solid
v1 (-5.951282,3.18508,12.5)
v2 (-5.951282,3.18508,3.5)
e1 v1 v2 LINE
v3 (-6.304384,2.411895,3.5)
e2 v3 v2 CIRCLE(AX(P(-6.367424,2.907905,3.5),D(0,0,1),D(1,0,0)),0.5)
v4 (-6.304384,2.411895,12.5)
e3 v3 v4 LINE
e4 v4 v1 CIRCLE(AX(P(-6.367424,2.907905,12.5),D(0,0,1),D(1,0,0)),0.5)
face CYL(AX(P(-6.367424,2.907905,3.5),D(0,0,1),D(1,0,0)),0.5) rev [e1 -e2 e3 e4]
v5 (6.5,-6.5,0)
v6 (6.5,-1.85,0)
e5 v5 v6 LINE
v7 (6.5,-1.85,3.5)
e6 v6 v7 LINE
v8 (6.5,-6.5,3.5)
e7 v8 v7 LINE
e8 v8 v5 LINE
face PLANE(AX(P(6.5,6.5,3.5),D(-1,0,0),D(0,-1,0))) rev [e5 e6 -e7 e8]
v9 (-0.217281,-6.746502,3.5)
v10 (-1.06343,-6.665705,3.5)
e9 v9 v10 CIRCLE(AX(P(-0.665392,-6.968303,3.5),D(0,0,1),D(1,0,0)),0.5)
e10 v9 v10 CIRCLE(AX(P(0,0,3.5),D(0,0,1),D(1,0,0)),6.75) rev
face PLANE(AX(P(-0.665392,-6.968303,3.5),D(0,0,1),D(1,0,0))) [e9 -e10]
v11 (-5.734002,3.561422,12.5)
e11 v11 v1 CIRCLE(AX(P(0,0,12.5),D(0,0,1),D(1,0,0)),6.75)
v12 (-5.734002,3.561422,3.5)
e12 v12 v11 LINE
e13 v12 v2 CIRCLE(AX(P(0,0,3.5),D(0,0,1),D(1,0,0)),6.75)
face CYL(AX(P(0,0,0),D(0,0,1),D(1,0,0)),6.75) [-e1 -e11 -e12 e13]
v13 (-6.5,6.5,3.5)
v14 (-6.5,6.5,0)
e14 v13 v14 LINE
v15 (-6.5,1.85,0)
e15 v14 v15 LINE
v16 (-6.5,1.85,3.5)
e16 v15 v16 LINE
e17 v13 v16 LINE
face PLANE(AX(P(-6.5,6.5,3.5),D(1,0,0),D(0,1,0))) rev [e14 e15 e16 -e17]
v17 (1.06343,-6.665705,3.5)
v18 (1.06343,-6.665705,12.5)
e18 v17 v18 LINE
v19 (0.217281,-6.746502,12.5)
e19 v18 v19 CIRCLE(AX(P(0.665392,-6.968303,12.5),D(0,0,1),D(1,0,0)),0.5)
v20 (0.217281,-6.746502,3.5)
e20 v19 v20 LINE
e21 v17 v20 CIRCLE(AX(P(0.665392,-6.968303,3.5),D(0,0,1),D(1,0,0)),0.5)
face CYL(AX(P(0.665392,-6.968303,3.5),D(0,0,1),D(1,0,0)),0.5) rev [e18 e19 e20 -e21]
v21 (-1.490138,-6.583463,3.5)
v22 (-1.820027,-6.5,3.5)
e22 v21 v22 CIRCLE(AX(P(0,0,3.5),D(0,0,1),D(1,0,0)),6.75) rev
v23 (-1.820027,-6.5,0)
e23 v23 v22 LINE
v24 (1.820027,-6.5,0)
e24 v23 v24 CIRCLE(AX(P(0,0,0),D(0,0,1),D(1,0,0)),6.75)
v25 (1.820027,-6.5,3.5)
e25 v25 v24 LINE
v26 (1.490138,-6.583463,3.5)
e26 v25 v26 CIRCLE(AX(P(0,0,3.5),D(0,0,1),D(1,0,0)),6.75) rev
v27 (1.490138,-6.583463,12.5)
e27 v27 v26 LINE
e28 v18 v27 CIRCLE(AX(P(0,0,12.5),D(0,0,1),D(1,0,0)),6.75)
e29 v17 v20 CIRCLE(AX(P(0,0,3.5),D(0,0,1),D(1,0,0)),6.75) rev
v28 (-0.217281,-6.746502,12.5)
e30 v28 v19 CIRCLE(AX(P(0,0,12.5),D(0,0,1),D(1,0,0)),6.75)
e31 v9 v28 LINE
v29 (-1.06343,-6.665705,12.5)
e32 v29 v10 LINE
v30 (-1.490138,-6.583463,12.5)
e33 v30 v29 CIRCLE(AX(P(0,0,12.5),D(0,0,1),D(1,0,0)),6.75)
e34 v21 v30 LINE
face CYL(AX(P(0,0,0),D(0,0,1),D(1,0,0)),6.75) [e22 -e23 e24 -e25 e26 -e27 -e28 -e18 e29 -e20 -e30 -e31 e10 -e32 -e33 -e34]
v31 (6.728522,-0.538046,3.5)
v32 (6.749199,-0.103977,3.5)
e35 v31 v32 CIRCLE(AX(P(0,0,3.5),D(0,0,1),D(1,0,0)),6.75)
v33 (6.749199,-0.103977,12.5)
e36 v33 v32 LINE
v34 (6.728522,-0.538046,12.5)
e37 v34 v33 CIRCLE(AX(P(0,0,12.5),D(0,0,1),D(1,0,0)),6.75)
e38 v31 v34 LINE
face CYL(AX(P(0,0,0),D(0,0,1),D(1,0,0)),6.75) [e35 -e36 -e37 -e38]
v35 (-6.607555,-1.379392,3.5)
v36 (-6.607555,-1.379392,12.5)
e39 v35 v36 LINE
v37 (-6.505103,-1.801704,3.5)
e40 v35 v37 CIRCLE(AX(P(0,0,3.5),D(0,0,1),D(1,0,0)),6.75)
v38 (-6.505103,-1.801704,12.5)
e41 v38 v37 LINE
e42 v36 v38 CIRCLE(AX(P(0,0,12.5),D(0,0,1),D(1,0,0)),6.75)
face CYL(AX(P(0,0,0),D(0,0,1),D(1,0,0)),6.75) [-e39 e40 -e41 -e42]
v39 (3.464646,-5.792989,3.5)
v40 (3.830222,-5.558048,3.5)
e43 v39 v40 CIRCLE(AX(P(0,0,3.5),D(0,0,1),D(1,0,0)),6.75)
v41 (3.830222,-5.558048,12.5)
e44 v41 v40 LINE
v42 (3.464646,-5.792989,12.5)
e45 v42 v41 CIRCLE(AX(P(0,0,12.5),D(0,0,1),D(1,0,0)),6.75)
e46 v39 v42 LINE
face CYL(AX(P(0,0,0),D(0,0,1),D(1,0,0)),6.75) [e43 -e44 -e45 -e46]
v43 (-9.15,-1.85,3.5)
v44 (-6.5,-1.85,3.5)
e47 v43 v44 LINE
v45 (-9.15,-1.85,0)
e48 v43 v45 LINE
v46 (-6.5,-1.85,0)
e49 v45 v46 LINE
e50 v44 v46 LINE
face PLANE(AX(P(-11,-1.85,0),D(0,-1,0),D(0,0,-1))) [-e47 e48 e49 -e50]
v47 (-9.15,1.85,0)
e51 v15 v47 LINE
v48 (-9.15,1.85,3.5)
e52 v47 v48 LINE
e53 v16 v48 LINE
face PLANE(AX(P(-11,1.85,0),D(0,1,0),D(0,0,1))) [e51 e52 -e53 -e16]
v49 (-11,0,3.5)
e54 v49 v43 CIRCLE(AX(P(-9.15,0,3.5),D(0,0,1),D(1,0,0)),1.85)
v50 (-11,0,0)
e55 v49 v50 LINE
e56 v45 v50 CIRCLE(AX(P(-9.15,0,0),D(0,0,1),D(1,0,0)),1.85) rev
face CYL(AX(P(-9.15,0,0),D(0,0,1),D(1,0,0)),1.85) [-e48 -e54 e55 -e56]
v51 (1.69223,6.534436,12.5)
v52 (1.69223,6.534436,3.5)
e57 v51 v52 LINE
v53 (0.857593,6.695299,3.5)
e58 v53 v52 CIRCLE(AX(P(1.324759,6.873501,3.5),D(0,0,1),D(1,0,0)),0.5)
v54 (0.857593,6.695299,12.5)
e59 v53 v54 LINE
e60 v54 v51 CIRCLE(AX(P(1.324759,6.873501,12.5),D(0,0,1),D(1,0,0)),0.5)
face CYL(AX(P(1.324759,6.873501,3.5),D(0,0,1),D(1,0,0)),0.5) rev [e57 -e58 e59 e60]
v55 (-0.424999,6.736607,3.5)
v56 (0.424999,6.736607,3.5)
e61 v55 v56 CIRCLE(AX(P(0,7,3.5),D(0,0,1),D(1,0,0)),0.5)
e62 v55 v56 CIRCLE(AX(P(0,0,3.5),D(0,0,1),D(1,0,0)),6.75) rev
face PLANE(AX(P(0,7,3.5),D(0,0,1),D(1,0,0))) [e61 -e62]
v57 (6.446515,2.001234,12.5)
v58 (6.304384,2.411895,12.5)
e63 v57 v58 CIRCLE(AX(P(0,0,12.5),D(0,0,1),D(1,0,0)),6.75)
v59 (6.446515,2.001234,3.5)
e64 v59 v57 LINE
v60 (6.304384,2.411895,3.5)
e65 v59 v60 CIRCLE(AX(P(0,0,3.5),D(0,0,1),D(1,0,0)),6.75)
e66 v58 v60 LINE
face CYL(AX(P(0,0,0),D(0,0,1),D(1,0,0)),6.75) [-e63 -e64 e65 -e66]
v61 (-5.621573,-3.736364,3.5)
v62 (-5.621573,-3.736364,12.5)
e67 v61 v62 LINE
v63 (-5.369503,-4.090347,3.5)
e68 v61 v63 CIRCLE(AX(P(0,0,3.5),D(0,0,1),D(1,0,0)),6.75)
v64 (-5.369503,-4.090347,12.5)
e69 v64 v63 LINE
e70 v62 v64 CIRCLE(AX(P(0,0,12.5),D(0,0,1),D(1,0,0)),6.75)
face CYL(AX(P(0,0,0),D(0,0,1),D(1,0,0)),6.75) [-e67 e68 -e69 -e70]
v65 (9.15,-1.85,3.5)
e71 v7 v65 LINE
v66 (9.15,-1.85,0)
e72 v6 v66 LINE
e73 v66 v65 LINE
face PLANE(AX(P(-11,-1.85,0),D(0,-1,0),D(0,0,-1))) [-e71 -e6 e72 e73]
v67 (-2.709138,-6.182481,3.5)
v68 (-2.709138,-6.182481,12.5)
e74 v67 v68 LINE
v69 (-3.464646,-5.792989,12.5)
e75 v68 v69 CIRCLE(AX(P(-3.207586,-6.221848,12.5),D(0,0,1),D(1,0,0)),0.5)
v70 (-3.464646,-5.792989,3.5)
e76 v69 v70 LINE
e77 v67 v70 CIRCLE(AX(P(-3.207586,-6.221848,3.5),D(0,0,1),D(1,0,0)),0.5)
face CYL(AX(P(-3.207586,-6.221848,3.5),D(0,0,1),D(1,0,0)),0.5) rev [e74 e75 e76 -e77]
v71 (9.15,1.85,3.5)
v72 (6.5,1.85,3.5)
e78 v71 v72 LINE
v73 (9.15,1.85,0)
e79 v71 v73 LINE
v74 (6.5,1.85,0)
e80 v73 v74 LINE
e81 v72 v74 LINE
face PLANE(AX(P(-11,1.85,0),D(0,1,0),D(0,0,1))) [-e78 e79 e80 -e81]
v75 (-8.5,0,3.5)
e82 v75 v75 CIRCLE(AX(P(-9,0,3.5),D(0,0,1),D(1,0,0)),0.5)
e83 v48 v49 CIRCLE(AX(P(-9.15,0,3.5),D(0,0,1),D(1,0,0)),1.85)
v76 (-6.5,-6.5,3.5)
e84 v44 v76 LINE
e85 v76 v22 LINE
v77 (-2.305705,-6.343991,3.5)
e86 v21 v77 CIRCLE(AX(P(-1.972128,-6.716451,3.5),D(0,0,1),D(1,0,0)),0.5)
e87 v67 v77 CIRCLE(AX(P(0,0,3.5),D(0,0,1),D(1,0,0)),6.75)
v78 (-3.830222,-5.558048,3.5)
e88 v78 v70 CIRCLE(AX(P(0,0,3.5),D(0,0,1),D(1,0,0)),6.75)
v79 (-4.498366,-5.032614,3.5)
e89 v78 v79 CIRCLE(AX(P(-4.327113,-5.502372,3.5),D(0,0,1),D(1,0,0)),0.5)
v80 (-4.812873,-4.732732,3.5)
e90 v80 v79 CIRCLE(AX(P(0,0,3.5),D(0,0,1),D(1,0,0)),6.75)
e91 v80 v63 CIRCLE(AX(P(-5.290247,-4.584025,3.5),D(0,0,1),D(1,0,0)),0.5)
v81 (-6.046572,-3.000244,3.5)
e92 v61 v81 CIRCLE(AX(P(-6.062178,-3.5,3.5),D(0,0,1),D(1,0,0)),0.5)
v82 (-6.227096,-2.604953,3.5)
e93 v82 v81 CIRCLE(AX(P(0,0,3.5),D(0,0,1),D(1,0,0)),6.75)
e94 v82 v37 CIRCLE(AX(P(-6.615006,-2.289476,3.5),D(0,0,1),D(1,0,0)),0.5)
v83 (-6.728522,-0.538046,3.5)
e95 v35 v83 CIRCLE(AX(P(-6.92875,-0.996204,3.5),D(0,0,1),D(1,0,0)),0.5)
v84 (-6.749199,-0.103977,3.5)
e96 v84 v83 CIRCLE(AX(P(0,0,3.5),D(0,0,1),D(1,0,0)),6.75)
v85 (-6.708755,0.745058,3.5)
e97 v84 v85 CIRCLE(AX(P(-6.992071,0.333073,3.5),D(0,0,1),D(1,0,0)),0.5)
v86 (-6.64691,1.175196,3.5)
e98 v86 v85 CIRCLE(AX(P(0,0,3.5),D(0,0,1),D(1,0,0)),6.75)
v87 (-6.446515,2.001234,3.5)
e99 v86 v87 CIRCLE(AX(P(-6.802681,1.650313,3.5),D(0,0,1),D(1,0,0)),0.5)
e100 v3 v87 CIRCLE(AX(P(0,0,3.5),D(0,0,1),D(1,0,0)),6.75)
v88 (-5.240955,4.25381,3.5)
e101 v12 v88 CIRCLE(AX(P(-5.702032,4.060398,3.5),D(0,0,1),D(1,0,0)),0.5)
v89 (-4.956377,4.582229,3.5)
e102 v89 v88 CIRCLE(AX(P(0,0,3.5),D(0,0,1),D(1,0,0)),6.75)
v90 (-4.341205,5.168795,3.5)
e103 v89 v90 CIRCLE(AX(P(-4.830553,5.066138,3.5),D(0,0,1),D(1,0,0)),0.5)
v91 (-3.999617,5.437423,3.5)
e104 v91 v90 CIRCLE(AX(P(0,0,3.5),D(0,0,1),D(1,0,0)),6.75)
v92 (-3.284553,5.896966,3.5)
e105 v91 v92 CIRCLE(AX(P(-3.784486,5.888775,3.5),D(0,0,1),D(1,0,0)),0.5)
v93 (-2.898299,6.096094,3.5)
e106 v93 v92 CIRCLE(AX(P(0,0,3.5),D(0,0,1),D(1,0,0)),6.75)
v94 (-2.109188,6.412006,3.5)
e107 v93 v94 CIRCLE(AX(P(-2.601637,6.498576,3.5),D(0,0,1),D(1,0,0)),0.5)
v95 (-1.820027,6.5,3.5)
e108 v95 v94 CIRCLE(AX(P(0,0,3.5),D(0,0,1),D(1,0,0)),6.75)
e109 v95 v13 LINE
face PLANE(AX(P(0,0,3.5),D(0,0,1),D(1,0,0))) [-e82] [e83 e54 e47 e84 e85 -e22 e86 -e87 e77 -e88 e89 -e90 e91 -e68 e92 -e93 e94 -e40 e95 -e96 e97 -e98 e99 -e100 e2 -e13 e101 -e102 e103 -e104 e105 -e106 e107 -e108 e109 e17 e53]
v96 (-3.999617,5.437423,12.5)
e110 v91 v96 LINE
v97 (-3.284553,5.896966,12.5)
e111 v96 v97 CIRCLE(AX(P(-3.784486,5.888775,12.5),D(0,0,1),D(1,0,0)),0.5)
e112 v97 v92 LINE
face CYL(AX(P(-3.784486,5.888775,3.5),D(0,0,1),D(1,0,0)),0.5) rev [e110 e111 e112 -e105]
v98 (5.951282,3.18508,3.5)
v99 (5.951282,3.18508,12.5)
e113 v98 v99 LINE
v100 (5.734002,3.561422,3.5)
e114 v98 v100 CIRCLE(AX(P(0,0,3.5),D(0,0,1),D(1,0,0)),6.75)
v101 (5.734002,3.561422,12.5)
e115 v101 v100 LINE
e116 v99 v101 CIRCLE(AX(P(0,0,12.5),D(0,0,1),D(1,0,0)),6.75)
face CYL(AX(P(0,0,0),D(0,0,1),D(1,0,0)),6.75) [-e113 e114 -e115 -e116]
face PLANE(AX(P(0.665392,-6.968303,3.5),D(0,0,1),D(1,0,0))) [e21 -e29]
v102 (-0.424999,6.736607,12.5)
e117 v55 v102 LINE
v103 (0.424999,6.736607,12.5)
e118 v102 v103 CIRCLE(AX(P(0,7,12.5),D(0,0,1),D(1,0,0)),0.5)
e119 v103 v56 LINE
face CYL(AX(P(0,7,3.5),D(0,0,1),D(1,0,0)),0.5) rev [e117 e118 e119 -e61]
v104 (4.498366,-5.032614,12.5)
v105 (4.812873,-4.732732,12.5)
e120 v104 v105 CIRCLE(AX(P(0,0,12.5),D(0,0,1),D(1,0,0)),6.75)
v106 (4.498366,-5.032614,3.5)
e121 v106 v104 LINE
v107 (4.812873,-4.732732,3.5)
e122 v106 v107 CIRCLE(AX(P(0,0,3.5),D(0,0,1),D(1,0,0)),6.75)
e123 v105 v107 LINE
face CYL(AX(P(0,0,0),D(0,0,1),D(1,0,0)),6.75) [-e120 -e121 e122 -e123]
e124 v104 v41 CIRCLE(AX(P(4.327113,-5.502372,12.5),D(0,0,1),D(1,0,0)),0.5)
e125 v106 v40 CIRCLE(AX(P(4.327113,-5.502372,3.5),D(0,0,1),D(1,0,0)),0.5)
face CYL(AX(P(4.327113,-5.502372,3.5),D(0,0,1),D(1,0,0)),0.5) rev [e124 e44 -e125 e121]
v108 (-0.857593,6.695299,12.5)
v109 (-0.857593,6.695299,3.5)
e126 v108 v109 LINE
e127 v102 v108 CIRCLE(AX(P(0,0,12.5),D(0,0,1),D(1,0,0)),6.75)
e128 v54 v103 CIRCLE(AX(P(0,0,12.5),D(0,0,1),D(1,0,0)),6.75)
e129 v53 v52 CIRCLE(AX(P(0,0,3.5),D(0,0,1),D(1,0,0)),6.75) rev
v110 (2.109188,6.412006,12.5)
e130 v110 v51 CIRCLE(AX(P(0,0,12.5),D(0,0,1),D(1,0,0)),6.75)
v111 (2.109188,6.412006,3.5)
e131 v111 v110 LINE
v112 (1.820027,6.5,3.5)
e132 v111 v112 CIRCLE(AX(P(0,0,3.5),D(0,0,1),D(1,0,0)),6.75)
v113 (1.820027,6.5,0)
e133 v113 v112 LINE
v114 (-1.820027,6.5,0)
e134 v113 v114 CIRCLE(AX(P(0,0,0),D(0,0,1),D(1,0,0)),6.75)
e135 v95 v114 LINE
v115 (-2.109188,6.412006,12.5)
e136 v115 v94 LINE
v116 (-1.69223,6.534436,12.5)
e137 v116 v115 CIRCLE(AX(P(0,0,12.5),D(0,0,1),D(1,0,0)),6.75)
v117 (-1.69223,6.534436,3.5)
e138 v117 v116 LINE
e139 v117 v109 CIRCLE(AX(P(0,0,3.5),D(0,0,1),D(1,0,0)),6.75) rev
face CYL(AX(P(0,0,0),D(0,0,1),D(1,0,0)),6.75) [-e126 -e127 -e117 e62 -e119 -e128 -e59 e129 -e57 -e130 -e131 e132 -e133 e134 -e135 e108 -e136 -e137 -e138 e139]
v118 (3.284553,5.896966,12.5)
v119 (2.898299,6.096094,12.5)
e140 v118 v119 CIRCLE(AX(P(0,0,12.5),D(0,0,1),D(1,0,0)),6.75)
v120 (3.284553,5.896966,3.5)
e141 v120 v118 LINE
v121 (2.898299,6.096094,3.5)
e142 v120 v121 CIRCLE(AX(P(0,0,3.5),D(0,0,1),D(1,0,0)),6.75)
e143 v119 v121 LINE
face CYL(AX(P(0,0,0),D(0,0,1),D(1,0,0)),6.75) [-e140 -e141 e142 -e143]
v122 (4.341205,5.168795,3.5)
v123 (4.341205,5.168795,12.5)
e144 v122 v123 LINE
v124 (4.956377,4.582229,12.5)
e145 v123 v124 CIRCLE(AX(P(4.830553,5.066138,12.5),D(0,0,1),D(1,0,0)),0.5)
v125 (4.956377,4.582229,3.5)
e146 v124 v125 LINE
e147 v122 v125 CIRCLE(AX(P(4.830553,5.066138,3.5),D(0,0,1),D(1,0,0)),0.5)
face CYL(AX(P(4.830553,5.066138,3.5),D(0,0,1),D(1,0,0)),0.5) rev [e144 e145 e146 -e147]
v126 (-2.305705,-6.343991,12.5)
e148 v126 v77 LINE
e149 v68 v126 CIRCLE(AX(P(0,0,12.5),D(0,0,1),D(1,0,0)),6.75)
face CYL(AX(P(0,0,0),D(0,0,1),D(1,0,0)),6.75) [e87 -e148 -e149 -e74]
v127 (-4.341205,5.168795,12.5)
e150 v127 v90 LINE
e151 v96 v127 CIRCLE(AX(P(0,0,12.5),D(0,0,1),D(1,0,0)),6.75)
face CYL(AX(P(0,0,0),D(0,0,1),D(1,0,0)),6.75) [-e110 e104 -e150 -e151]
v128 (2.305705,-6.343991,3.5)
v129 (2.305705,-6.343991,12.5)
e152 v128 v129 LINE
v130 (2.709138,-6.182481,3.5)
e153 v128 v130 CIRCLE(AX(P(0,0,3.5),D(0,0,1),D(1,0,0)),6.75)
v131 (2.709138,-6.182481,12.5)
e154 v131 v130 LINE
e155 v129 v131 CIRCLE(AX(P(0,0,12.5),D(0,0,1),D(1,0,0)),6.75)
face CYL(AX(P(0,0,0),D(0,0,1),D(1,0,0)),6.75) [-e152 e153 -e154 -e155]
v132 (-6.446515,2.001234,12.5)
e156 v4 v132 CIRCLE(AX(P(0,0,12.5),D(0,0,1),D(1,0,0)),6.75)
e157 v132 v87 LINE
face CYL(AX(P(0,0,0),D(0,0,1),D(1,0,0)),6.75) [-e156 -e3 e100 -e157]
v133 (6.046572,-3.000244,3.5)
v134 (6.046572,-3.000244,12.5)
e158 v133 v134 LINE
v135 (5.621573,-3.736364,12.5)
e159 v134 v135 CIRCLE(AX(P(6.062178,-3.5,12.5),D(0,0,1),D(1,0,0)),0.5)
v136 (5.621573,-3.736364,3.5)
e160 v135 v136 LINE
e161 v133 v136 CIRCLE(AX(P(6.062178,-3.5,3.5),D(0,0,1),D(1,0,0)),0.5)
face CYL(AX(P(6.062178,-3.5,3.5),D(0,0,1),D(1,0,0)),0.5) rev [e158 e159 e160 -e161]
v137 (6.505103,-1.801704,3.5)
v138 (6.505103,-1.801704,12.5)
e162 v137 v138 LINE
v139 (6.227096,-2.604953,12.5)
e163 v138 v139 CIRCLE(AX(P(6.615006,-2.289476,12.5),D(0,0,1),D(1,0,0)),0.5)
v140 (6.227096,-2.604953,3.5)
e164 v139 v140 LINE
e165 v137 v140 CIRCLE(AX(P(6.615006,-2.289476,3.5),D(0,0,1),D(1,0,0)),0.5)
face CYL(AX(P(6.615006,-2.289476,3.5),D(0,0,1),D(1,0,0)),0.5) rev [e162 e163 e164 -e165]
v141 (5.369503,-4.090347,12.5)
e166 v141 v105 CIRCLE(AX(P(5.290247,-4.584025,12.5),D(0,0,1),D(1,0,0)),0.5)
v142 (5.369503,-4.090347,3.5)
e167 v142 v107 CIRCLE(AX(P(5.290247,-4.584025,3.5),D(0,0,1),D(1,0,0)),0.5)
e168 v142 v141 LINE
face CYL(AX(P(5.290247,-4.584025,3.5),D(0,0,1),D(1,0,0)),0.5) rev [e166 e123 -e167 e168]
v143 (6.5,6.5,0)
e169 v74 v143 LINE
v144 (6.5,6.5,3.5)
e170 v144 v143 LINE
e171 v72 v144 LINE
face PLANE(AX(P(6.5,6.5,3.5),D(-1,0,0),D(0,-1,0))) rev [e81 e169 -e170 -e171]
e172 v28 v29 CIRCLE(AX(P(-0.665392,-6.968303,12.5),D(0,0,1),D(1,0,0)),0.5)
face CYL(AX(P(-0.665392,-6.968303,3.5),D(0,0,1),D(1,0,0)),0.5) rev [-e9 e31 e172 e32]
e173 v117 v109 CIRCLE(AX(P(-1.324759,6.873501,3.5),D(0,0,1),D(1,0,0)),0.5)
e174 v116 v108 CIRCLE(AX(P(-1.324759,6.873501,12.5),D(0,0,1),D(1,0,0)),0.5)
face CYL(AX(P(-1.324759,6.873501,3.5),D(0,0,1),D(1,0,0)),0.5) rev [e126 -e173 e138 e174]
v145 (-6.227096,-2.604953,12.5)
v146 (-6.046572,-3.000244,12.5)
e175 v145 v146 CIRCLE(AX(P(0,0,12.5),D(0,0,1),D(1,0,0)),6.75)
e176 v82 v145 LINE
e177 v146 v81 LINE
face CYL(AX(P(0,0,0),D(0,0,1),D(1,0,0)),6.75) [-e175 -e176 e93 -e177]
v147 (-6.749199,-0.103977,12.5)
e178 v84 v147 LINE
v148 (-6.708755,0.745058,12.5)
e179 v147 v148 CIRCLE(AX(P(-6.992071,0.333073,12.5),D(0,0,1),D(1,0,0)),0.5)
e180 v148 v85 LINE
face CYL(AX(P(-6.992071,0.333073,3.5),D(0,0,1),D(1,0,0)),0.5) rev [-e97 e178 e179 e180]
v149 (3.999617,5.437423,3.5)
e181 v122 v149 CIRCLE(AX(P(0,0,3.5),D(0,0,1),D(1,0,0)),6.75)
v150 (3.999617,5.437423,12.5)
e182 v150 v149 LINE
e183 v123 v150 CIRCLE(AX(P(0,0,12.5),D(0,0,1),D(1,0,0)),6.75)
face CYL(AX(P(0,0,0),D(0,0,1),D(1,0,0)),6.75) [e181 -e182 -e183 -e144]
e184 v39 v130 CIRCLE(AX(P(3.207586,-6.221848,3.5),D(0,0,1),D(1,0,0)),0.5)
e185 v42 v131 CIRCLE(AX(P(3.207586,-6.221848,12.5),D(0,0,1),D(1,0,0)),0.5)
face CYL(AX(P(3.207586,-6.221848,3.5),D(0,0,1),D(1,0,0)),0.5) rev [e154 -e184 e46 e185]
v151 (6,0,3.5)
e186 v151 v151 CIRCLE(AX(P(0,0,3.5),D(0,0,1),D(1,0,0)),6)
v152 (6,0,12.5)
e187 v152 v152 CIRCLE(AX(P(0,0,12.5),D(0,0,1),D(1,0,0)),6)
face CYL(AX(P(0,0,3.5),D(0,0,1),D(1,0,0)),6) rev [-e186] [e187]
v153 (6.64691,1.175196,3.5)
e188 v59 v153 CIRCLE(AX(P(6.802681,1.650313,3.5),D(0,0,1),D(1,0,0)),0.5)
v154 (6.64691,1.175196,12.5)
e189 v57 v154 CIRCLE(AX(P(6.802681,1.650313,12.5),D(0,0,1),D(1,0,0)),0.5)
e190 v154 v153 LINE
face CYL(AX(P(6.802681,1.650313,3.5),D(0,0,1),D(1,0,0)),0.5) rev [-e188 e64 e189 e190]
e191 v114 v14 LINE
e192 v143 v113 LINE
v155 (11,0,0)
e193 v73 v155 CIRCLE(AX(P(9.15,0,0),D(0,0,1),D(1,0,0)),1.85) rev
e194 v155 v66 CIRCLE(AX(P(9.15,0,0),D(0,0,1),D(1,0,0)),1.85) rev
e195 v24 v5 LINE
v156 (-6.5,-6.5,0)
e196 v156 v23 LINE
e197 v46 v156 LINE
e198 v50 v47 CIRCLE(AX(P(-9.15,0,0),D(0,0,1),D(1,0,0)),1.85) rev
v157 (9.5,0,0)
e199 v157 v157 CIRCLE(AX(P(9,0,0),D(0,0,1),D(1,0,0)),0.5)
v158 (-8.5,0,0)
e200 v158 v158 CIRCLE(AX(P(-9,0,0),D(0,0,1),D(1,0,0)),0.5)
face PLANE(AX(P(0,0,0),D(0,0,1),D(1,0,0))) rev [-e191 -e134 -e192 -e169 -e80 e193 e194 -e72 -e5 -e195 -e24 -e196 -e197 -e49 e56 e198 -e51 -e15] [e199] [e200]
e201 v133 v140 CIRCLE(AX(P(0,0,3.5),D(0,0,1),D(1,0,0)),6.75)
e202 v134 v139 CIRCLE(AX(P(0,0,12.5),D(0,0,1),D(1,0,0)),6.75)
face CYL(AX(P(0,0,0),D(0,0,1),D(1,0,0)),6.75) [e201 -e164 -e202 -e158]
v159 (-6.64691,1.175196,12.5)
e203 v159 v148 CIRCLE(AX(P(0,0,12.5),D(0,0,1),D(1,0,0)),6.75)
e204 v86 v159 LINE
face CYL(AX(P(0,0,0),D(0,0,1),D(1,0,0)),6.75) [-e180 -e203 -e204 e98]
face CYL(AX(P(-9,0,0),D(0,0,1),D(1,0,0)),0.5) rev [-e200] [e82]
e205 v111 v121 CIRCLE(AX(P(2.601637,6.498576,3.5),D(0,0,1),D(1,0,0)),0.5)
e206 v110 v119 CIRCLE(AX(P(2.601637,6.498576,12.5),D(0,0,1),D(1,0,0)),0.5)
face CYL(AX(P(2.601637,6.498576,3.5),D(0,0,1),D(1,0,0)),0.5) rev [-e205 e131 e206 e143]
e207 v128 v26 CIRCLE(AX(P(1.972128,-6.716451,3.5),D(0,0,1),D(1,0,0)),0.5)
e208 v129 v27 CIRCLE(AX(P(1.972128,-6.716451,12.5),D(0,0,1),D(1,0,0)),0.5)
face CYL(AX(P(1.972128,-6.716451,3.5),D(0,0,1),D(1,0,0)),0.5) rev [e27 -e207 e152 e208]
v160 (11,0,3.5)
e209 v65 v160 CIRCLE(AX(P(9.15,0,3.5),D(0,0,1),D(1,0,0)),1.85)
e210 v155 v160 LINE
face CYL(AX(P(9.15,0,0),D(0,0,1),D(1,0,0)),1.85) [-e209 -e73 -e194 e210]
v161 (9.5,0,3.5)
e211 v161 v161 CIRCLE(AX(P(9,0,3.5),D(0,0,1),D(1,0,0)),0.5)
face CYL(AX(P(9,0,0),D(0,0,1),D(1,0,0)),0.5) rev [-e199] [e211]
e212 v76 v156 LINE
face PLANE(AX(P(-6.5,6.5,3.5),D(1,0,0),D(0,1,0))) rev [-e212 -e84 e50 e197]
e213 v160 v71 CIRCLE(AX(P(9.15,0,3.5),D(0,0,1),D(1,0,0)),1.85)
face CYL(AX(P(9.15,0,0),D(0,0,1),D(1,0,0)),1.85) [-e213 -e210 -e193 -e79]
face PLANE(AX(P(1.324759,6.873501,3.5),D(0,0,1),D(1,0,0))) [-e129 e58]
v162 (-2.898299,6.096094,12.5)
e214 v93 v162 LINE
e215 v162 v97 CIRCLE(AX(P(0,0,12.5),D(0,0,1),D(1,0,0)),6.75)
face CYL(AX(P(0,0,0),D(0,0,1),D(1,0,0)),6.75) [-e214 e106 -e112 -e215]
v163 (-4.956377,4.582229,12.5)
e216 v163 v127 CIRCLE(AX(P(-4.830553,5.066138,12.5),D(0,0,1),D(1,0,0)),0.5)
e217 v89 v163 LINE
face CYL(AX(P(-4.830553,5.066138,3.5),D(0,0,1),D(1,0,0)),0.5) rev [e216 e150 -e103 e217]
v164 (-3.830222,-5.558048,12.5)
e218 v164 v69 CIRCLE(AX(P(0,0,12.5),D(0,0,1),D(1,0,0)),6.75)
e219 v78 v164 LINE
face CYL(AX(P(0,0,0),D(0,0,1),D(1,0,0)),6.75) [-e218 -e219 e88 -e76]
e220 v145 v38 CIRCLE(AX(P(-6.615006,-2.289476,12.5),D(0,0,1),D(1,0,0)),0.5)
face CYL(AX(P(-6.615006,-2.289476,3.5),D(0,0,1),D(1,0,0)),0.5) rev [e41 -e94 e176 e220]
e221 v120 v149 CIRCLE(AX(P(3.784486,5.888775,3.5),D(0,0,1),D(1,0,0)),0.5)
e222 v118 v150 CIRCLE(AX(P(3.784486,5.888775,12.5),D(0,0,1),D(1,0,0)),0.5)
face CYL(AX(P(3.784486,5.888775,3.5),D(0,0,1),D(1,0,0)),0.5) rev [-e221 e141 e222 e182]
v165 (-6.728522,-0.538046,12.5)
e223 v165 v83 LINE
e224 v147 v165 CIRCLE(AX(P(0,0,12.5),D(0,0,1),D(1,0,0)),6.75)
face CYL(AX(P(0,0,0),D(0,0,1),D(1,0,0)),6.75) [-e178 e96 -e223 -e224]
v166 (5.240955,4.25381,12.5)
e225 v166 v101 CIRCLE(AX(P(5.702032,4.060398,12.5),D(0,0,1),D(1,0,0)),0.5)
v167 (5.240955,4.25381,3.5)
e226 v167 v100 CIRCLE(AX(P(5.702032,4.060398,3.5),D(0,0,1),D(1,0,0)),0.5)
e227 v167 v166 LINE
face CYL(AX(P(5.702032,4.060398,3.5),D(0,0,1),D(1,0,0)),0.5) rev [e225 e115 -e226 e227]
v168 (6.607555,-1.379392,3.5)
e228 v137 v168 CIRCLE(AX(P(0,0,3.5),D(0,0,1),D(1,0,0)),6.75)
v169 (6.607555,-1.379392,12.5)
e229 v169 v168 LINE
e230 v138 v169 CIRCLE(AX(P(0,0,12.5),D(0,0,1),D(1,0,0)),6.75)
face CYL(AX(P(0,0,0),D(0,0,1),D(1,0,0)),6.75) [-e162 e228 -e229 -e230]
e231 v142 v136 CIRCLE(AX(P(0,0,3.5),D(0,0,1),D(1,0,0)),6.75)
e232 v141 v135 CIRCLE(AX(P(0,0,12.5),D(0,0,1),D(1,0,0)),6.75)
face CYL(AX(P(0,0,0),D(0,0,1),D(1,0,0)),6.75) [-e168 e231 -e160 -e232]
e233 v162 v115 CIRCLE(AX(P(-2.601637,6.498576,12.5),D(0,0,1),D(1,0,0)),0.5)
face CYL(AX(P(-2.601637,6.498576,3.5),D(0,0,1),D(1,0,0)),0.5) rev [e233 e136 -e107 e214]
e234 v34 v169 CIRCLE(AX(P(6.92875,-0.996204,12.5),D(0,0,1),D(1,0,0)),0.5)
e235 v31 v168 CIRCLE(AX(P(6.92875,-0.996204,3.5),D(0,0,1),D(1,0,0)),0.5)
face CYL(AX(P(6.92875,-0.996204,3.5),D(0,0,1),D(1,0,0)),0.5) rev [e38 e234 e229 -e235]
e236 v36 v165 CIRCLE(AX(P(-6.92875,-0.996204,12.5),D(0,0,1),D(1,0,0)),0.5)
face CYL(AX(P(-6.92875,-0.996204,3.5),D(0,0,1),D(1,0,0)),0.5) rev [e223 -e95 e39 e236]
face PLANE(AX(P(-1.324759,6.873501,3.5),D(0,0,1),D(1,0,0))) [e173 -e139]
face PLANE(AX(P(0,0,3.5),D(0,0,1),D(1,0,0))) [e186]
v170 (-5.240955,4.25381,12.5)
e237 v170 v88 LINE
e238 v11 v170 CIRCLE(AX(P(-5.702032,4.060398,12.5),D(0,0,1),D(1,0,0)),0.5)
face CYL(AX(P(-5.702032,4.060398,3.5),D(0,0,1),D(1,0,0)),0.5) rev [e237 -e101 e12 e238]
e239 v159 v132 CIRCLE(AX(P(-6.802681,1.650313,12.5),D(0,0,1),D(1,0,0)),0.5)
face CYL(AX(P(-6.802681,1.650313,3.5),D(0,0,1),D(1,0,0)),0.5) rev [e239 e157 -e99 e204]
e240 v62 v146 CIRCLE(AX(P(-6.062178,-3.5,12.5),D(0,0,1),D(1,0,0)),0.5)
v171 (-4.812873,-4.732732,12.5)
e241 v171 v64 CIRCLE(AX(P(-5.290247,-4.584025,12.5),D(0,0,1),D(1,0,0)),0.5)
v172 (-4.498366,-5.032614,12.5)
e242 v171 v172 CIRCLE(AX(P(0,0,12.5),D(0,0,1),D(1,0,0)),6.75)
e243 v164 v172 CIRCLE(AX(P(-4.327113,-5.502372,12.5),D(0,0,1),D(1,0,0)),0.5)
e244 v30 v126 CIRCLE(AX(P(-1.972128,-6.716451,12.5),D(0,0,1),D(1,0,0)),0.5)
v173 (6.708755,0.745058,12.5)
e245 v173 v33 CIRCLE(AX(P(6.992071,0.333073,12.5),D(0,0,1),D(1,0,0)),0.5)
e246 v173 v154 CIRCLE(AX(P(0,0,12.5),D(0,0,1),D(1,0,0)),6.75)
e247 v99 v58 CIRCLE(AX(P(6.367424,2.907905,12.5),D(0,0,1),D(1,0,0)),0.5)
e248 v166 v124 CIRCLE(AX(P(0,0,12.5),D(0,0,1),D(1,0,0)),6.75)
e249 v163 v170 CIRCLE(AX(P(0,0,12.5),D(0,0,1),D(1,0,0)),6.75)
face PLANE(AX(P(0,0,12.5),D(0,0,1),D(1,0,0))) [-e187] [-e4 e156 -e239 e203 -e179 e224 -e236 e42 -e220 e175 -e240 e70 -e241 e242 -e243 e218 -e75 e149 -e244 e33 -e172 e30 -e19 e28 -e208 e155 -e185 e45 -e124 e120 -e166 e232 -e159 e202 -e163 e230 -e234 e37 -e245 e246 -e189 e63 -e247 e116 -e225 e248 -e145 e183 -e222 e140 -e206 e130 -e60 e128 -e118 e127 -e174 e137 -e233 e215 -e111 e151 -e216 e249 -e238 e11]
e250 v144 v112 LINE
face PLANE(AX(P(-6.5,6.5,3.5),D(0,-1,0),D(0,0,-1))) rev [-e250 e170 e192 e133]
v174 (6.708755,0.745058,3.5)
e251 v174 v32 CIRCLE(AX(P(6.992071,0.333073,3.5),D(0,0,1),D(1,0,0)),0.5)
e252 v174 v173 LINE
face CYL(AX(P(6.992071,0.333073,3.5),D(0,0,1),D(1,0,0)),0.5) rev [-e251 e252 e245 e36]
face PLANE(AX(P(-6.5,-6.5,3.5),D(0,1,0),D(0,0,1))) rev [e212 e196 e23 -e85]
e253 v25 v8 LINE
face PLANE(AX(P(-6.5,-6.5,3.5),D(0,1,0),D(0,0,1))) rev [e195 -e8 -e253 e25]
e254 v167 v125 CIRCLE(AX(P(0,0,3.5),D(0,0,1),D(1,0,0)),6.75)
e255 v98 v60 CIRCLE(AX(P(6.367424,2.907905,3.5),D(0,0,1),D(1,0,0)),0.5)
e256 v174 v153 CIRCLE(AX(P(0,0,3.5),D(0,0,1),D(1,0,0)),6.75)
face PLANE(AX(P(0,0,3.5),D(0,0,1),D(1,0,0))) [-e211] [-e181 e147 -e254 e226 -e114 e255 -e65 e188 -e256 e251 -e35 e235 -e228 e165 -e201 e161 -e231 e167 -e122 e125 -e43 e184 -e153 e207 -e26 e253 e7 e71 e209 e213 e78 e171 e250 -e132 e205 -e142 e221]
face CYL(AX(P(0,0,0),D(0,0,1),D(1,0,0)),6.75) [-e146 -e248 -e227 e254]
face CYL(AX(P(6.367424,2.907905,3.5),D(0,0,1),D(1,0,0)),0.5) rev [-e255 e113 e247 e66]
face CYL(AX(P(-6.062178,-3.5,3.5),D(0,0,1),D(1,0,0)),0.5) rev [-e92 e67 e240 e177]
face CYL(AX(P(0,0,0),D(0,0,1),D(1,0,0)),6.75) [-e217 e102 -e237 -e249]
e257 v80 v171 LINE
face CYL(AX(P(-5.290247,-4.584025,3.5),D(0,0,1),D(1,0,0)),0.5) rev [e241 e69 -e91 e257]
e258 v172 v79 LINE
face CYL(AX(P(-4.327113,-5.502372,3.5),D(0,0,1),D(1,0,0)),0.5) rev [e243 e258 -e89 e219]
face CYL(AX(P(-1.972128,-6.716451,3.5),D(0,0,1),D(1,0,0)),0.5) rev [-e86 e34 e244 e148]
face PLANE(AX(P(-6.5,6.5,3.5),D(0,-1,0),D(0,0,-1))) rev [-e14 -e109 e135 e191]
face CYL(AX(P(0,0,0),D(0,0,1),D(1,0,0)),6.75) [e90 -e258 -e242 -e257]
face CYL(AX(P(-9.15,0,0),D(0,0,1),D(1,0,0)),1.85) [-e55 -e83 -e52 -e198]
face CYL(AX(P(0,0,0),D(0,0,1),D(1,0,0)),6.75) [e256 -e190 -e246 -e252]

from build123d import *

# Parameters (mm, degrees)
SKETCH1_W                = 13
SKETCH1_H                = 13
BOSS_EXTRUDE1_DEPTH      = 3.5
SKETCH2_W                = 22
SKETCH2_H                = 3.7
BOSS_EXTRUDE2_DEPTH      = 3.5
FILLET1_R                = 1.85
SKETCH3_R                = 0.5
CUT_EXTRUDE1_DEPTH       = 3.5
BOSS_EXTRUDE3_DEPTH      = 9
BOSS_EXTRUDE3_DEPTH_BACK = 3.5
SKETCH4_R                = 6.75
SKETCH5_R                = 0.5
CUT_EXTRUDE2_DEPTH       = 9
SKETCH6_R                = 6
CUT_EXTRUDE3_DEPTH       = 9


with BuildPart() as part:
    # Sketch1 → Boss-Extrude1 (new body)
    with BuildSketch(Plane.XY):
        Rectangle(SKETCH1_W, SKETCH1_H)
    extrude(amount=BOSS_EXTRUDE1_DEPTH)

    # Sketch2 → Boss-Extrude2 (add)
    with BuildSketch(Plane.XY.offset(3.5)):
        Rectangle(SKETCH2_W, SKETCH2_H)
    extrude(amount=-BOSS_EXTRUDE2_DEPTH)

    # Fillet1
    fillet1_edges = [part.edges().sort_by_distance(p)[0] for p in [
        (11, -1.85, 1.75),
        (11, 1.85, 1.75),
        (-11, -1.85, 1.75),
        (-11, 1.85, 1.75),
    ]]
    fillet(fillet1_edges, radius=FILLET1_R - 0.0001)  # a hair under: the kernel refuses the full size

    # Sketch3 → Cut-Extrude1 (cut)
    with BuildSketch(Plane.XY.offset(3.5)):
        with Locations((-9, 0)):
            Circle(SKETCH3_R)
        with Locations((9, 0)):
            Circle(SKETCH3_R)
    extrude(amount=-CUT_EXTRUDE1_DEPTH, mode=Mode.SUBTRACT)

    # Sketch4 → Boss-Extrude3 (add, two sides: drawn at the far end of the back side and taken through both)
    with BuildSketch(Plane.XY.offset(3.5).offset(-BOSS_EXTRUDE3_DEPTH_BACK)):
        Circle(SKETCH4_R)
    extrude(amount=BOSS_EXTRUDE3_DEPTH + BOSS_EXTRUDE3_DEPTH_BACK)

    # Sketch5 → Cut-Extrude2 (cut)
    with BuildSketch(Plane.XY.offset(12.5)):
        with Locations((0, 7)):
            Circle(SKETCH5_R)
        with Locations((1.324758711, 6.873500881)):
            Circle(SKETCH5_R)
        with Locations((2.60163719, 6.498575531)):
            Circle(SKETCH5_R)
        with Locations((3.784485722, 5.88877473)):
            Circle(SKETCH5_R)
        with Locations((4.83055308, 5.066138267)):
            Circle(SKETCH5_R)
        with Locations((5.702031664, 4.060398367)):
            Circle(SKETCH5_R)
        with Locations((6.367423967, 2.907905091)):
            Circle(SKETCH5_R)
        with Locations((6.802680978, 1.650312549)):
            Circle(SKETCH5_R)
        with Locations((6.992071374, 0.333073411)):
            Circle(SKETCH5_R)
        with Locations((6.928750093, -0.996203868)):
            Circle(SKETCH5_R)
        with Locations((6.615005731, -2.289475743)):
            Circle(SKETCH5_R)
        with Locations((6.062177826, -3.5)):
            Circle(SKETCH5_R)
        with Locations((5.29024702, -4.584025138)):
            Circle(SKETCH5_R)
        with Locations((4.327112904, -5.502371663)):
            Circle(SKETCH5_R)
        with Locations((3.207585652, -6.221848141)):
            Circle(SKETCH5_R)
        with Locations((1.972127898, -6.716450815)):
            Circle(SKETCH5_R)
        with Locations((0.665392303, -6.968303458)):
            Circle(SKETCH5_R)
        with Locations((-0.665392303, -6.968303458)):
            Circle(SKETCH5_R)
        with Locations((-1.972127898, -6.716450815)):
            Circle(SKETCH5_R)
        with Locations((-3.207585652, -6.221848141)):
            Circle(SKETCH5_R)
        with Locations((-4.327112904, -5.502371663)):
            Circle(SKETCH5_R)
        with Locations((-5.29024702, -4.584025138)):
            Circle(SKETCH5_R)
        with Locations((-6.062177826, -3.5)):
            Circle(SKETCH5_R)
        with Locations((-6.615005731, -2.289475743)):
            Circle(SKETCH5_R)
        with Locations((-6.928750093, -0.996203868)):
            Circle(SKETCH5_R)
        with Locations((-6.992071374, 0.333073411)):
            Circle(SKETCH5_R)
        with Locations((-6.802680978, 1.650312549)):
            Circle(SKETCH5_R)
        with Locations((-6.367423967, 2.907905091)):
            Circle(SKETCH5_R)
        with Locations((-5.702031664, 4.060398367)):
            Circle(SKETCH5_R)
        with Locations((-4.83055308, 5.066138267)):
            Circle(SKETCH5_R)
        with Locations((-3.784485722, 5.88877473)):
            Circle(SKETCH5_R)
        with Locations((-2.60163719, 6.498575531)):
            Circle(SKETCH5_R)
        with Locations((-1.324758711, 6.873500881)):
            Circle(SKETCH5_R)
    extrude(amount=-CUT_EXTRUDE2_DEPTH, mode=Mode.SUBTRACT)

    # Sketch6 → Cut-Extrude3 (cut)
    with BuildSketch(Plane.XY.offset(12.5)):
        Circle(SKETCH6_R)
    extrude(amount=-CUT_EXTRUDE3_DEPTH, mode=Mode.SUBTRACT)


solid = part.part
